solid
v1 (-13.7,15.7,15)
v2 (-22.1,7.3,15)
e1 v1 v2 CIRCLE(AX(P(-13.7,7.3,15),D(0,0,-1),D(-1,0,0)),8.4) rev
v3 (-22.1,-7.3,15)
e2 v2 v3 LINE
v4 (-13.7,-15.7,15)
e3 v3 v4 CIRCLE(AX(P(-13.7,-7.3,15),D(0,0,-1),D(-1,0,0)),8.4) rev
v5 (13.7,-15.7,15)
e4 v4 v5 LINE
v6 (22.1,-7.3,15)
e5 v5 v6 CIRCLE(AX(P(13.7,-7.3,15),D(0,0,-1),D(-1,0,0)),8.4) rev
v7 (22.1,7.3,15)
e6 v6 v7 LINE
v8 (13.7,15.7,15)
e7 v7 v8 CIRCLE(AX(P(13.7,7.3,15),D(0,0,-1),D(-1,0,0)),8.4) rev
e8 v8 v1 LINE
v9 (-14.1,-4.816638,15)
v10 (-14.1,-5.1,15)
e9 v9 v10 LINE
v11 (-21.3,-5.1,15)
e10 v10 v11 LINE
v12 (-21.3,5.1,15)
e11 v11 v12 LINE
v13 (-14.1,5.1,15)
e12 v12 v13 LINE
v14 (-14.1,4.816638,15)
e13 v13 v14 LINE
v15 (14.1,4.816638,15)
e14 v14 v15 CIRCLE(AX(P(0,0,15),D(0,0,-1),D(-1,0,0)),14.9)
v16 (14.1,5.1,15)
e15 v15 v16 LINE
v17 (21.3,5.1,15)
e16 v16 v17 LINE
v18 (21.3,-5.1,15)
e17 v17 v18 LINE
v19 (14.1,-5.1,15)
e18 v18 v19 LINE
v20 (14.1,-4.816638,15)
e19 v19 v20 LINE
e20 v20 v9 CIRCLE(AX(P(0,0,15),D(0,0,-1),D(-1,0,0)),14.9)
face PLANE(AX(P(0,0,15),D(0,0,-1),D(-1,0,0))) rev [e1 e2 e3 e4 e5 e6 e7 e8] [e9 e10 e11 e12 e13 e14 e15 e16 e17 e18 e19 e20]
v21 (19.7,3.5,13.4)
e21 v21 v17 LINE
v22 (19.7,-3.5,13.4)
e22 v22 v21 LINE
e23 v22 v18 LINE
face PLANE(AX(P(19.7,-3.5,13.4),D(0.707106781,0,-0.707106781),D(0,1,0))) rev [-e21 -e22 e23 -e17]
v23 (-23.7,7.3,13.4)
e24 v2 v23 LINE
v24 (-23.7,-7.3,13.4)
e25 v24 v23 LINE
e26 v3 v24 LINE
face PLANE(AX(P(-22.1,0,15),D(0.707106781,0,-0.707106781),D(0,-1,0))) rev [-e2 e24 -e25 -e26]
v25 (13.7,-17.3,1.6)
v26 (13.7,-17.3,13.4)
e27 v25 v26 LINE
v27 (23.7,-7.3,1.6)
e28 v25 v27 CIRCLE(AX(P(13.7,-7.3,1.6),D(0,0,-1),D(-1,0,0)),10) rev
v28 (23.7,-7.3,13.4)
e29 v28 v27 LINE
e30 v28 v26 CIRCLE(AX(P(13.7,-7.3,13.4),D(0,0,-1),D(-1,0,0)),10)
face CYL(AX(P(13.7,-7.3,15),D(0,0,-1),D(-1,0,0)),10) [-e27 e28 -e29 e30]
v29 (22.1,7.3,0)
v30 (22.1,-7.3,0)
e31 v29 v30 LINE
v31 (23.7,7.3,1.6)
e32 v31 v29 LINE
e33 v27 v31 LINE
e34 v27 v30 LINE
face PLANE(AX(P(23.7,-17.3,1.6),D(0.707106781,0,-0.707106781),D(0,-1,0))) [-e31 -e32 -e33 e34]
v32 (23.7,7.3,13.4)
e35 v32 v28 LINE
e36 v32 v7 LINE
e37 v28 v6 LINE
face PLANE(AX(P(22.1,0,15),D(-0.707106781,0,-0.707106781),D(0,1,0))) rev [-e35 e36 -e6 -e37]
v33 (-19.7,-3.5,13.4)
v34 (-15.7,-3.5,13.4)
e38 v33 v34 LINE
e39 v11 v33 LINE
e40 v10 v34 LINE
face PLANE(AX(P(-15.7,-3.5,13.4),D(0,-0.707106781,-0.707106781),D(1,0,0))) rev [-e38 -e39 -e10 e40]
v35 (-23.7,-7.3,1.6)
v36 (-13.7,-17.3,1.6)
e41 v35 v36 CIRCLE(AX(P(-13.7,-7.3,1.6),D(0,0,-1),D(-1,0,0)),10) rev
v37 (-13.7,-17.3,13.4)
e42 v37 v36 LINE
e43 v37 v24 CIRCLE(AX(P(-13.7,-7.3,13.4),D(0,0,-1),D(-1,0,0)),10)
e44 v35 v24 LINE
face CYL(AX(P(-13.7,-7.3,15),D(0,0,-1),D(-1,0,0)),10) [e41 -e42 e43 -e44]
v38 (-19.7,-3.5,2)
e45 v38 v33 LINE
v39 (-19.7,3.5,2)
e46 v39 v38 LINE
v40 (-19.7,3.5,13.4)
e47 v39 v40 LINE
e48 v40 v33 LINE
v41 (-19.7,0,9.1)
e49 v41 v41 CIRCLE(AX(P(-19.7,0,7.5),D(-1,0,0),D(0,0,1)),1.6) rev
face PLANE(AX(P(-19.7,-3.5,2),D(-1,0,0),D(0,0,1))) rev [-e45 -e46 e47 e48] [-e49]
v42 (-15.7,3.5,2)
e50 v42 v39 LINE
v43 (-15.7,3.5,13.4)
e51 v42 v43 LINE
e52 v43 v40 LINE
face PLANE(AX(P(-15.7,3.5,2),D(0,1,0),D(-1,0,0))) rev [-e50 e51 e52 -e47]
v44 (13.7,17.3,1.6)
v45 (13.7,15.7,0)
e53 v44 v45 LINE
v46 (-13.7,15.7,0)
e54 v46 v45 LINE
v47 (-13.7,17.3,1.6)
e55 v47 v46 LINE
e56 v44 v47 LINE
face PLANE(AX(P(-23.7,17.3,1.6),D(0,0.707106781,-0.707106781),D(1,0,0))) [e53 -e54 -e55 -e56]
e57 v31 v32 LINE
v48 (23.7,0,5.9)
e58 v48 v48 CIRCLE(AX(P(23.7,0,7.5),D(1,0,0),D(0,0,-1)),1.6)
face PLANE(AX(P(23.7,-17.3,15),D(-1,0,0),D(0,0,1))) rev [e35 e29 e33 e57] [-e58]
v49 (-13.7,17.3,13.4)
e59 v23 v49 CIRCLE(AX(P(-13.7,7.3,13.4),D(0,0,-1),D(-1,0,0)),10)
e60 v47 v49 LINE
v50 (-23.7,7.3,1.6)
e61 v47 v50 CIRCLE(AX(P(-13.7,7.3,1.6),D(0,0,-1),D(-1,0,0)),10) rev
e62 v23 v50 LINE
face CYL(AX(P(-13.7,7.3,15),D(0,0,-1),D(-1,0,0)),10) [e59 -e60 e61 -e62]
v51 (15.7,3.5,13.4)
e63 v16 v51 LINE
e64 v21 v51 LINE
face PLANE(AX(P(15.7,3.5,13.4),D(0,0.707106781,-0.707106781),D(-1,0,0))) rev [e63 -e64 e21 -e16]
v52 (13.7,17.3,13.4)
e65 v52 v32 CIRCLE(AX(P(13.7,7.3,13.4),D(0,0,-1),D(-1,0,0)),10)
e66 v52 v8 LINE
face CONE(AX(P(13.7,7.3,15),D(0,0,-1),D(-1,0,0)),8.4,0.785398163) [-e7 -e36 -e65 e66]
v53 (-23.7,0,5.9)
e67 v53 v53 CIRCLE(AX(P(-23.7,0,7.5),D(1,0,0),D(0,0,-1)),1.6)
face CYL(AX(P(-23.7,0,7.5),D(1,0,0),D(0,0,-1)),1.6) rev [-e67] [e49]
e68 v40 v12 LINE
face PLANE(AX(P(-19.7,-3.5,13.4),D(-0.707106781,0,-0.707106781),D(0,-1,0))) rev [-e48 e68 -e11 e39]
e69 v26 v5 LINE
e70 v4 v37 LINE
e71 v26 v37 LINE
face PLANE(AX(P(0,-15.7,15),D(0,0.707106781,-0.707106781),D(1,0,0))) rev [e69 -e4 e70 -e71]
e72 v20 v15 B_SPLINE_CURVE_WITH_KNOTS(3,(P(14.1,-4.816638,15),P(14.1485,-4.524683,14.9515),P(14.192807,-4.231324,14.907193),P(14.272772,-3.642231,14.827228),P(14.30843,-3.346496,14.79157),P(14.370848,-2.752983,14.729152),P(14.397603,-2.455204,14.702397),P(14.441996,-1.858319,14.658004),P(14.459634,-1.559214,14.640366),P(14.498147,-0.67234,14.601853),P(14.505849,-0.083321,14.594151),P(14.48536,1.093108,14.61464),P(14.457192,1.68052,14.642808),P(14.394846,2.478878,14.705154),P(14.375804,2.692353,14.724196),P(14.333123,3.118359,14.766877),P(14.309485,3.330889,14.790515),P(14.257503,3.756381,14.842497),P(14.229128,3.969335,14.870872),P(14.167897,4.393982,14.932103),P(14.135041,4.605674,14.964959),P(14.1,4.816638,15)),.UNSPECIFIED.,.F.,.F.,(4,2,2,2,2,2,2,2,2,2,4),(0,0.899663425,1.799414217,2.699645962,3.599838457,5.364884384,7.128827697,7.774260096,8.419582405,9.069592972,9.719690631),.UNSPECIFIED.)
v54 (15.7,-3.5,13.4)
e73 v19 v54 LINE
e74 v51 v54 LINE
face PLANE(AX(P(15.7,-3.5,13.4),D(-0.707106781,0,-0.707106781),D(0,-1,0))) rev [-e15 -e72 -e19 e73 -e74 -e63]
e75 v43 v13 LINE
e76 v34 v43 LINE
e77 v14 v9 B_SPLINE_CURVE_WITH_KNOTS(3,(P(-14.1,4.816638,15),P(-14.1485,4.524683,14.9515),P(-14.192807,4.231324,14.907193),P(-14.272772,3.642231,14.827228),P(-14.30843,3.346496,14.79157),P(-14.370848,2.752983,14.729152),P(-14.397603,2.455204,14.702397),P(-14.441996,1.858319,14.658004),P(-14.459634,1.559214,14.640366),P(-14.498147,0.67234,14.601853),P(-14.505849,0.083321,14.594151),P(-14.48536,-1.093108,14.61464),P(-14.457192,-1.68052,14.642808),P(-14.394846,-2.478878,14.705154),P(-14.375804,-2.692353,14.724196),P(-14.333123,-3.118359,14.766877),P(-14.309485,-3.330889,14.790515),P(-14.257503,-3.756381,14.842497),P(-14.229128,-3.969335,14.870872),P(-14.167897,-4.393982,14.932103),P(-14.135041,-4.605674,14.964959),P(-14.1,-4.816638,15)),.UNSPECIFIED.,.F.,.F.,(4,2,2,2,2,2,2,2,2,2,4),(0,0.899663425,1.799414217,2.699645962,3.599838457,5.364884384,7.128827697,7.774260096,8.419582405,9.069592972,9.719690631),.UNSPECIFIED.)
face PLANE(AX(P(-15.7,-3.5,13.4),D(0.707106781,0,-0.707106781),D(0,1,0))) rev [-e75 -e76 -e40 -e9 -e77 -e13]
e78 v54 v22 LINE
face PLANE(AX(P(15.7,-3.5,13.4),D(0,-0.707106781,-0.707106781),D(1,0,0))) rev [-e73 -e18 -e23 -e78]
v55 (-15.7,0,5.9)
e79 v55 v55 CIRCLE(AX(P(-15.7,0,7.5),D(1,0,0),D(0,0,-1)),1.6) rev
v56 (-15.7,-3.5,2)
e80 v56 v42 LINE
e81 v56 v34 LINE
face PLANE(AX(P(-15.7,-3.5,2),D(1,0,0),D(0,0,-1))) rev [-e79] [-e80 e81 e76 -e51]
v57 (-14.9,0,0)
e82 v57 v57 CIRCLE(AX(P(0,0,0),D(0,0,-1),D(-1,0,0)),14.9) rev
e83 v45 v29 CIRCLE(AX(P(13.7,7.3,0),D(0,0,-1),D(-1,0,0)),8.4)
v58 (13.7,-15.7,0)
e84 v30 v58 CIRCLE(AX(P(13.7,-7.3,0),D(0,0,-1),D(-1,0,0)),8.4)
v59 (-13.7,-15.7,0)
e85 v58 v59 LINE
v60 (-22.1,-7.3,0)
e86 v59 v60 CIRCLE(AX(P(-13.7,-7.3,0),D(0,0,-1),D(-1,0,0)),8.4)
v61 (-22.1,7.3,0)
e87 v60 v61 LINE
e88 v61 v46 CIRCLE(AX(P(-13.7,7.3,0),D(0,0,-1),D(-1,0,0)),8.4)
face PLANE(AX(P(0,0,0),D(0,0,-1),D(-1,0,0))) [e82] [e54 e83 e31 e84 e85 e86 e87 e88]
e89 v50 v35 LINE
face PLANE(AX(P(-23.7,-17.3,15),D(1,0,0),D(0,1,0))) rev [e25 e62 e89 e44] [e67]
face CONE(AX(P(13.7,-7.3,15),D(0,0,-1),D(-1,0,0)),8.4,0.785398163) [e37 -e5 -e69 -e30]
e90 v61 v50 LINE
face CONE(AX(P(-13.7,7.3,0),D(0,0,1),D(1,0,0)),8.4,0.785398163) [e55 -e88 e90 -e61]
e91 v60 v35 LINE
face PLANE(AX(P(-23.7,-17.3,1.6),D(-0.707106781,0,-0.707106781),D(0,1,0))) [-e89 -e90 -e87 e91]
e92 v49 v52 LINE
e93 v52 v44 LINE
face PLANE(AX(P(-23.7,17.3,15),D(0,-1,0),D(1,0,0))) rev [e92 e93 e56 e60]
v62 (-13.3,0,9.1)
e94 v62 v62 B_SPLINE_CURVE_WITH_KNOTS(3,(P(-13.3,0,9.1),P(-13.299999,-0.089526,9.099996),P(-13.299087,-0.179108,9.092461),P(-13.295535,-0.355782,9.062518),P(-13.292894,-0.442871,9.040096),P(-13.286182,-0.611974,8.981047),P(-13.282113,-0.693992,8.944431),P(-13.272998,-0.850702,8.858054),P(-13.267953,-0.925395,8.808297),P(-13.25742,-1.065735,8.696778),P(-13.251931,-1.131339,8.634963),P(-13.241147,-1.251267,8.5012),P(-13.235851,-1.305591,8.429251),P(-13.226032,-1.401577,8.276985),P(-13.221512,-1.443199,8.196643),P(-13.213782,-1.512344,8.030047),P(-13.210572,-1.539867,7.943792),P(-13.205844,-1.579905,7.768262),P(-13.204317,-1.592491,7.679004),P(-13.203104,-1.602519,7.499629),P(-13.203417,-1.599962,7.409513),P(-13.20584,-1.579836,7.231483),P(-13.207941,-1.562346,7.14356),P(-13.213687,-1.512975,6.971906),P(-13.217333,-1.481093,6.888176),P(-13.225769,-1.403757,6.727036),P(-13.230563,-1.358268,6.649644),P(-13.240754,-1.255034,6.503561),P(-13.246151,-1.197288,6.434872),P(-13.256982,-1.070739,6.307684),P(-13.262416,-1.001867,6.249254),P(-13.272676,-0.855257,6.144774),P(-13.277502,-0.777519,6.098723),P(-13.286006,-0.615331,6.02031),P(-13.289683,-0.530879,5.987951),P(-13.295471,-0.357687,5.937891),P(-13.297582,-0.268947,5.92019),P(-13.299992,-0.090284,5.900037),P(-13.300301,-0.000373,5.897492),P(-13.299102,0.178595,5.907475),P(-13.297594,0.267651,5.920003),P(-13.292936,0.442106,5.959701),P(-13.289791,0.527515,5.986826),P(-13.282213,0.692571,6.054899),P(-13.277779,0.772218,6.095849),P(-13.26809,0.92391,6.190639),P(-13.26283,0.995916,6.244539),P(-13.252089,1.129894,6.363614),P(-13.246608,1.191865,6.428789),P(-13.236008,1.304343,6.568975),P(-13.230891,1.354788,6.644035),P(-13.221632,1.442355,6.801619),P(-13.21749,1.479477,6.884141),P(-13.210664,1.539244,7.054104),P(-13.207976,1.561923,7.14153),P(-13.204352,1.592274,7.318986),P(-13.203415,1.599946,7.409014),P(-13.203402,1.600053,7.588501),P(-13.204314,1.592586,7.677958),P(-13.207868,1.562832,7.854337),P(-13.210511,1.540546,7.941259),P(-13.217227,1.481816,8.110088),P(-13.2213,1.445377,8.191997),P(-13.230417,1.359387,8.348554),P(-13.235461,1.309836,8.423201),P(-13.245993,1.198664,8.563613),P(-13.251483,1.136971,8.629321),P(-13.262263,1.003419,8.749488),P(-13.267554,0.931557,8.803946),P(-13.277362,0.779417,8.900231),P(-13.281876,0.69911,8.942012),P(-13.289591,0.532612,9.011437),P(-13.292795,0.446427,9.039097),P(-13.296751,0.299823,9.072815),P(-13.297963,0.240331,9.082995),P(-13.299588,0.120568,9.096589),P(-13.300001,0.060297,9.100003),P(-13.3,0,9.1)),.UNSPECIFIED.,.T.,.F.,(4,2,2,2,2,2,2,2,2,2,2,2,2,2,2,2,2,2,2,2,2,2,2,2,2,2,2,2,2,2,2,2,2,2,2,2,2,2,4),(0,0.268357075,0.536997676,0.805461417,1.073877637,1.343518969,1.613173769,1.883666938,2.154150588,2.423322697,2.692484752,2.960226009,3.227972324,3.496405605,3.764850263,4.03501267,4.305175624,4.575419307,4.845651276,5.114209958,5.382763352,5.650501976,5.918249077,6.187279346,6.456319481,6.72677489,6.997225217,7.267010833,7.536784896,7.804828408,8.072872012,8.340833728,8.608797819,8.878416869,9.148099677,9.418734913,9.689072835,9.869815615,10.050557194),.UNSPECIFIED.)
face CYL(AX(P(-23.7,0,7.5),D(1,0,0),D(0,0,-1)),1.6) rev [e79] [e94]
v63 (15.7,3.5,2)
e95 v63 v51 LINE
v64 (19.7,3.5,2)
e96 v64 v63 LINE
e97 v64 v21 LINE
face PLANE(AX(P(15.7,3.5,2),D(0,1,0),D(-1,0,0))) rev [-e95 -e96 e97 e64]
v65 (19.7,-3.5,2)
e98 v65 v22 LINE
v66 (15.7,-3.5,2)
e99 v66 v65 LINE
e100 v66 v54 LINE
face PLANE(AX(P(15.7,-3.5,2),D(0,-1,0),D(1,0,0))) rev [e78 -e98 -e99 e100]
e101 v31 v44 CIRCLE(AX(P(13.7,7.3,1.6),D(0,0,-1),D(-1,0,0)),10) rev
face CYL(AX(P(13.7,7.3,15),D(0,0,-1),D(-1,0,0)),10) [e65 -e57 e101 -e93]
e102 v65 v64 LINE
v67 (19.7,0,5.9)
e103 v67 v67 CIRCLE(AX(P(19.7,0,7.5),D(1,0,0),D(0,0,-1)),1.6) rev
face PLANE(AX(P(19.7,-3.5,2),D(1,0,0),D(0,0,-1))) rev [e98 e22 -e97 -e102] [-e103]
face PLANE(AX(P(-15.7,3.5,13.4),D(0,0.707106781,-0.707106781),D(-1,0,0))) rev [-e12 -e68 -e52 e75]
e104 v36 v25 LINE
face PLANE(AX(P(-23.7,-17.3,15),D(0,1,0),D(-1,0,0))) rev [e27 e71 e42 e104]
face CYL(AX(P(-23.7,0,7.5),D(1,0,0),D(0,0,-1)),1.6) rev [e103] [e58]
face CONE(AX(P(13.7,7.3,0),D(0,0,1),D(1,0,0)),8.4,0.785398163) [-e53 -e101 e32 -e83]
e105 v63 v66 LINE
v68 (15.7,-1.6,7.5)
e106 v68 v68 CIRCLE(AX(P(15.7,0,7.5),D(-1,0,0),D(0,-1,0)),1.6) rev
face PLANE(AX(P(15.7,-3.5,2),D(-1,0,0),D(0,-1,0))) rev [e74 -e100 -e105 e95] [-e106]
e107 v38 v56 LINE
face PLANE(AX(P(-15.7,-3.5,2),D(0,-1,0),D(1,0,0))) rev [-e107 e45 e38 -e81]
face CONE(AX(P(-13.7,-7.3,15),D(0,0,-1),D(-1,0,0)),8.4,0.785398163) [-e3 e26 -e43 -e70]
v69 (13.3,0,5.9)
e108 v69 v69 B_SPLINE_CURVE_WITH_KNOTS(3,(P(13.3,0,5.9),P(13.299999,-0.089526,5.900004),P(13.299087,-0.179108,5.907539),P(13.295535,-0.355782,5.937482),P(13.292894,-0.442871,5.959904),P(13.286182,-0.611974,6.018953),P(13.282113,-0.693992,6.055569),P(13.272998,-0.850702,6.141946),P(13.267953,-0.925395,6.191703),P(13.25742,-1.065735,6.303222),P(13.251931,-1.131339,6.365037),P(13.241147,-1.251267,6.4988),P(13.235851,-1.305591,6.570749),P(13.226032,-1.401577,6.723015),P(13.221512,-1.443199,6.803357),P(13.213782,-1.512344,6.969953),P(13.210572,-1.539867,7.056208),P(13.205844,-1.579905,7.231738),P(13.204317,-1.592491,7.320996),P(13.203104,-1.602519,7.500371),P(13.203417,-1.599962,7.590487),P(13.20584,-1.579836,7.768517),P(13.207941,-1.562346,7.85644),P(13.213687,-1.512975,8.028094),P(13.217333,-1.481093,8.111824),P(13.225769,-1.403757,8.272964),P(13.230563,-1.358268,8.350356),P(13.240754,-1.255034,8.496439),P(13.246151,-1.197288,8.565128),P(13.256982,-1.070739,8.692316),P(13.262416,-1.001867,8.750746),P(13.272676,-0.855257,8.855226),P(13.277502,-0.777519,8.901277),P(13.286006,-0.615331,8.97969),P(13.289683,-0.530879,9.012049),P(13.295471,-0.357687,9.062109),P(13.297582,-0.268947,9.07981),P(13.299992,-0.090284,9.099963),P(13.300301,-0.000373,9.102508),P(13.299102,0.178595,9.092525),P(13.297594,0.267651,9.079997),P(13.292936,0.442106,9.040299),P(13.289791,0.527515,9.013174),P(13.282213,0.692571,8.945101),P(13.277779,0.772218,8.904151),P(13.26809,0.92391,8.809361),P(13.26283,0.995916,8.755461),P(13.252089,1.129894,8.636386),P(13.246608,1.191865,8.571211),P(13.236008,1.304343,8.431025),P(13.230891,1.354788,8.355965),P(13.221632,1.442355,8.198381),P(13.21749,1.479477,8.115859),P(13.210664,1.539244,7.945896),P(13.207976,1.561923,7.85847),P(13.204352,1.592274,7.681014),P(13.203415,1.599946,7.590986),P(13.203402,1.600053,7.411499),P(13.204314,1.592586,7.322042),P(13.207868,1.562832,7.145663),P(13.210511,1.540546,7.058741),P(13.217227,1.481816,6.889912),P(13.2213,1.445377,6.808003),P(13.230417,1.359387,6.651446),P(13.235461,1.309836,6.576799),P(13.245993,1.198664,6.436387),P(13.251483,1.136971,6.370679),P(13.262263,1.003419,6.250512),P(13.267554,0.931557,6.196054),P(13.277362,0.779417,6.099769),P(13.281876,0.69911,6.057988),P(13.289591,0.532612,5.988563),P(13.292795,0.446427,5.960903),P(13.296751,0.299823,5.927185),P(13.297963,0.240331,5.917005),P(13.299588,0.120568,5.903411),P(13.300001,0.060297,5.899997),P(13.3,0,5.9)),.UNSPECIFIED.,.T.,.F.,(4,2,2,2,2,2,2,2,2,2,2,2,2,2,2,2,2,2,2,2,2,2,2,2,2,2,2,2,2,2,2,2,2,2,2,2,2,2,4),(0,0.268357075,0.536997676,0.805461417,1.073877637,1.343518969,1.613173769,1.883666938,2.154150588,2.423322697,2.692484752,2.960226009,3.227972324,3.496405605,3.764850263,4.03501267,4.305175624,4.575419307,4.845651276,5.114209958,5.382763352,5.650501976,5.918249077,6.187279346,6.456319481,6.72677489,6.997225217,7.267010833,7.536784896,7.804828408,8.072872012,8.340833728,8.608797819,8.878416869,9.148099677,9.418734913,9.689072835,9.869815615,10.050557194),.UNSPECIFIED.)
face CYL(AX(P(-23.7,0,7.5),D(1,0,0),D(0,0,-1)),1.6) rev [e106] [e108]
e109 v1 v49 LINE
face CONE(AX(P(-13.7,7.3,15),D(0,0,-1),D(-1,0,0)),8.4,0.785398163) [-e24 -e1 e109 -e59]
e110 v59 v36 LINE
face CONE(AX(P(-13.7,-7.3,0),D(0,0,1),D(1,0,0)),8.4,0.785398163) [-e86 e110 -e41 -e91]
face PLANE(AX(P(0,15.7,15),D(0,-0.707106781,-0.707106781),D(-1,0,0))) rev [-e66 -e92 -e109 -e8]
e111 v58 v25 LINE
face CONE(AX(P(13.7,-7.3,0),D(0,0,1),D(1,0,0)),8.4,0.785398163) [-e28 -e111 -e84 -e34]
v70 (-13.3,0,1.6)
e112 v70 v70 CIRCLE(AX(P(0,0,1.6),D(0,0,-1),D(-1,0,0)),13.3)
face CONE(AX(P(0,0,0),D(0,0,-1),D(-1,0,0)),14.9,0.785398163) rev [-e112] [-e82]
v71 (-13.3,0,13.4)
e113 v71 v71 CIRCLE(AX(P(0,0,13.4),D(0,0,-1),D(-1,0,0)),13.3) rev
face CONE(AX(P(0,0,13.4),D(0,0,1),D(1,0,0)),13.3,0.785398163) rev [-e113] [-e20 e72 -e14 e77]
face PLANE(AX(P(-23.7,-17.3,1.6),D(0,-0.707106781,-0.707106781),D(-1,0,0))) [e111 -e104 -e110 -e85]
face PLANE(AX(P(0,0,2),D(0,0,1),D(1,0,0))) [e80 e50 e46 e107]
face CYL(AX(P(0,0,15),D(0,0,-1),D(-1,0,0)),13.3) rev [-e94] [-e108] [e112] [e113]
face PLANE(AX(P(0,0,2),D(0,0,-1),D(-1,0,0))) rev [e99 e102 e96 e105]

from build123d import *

# Parameters (mm, degrees)
SKETCH1_W           = 47.4
SKETCH1_H           = 34.6
SKETCH1_R           = 13.3
BOSS_EXTRUDE1_DEPTH = 15
SKETCH2_R           = 1.6
CUT_EXTRUDE1_DEPTH  = 53.640763672
SKETCH3_W           = 4
SKETCH3_H           = 7
CUT_EXTRUDE2_DEPTH  = 13
CHAMFER1_SIZE       = 1.6
FILLET1_R           = 10
CHAMFER3_SIZE       = 1.6
CHAMFER4_SIZE       = 1.6


with BuildPart() as part:
    # Sketch1 → Boss-Extrude1 (new body)
    with BuildSketch(Plane.XY):
        Rectangle(SKETCH1_W, SKETCH1_H)
        Circle(SKETCH1_R, mode=Mode.SUBTRACT)
    extrude(amount=BOSS_EXTRUDE1_DEPTH)

    # Sketch2 → Cut-Extrude1 (cut, through all)
    with BuildSketch(Plane(origin=(23.7, 0, 0), x_dir=(0, 0, -1), z_dir=(1, 0, 0))):
        with Locations((-7.5, 0)):
            Circle(SKETCH2_R)
    extrude(amount=-CUT_EXTRUDE1_DEPTH, mode=Mode.SUBTRACT)

    # Sketch3 → Cut-Extrude2 (cut)
    with BuildSketch(Plane.XY.offset(15)):
        with Locations((17.7, 0)):
            Rectangle(SKETCH3_W, SKETCH3_H)
        with Locations((-17.7, 0)):
            Rectangle(SKETCH3_W, SKETCH3_H)
    extrude(amount=-CUT_EXTRUDE2_DEPTH, mode=Mode.SUBTRACT)

    # Chamfer1
    chamfer1_edges = [part.edges().sort_by_distance(p)[0] for p in [
        (-13.3, 0, 15),
    ]]
    chamfer(chamfer1_edges, length=CHAMFER1_SIZE)

    # Chamfer2
    # the kernel refuses this chamfer: 1.6 mm, written as the material it takes off along each edge
    with BuildSketch(Plane(origin=(19.7, -3.5, 15), x_dir=(0.9996219169112968, 0, 0.027495876610586226), z_dir=(0, 1, 0)), Plane(origin=(15.7, 3.5, 15), x_dir=(-0.9996219169112968, 0, 0.027495876610586285), z_dir=(0, -1, 0)), Plane(origin=(-15.7, -3.5, 15), x_dir=(0.9996219169112968, 0, 0.027495876610586285), z_dir=(0, 1, 0)), Plane(origin=(-19.7, 3.5, 15), x_dir=(-0.9996219169112968, 0, 0.027495876610586226), z_dir=(0, -1, 0))) as chamfer2_piece_1:
        with BuildLine():
            Line((1.645877112, 0), (-0.090475448, 1.64338847))
            Line((-0.090475448, 1.64338847), (-0.122463349, 1.642508602))
            ThreePointArc((-0.122463349, 1.642508602), (-0.054606763, 0.821436527), (-0.031987901, -0.000879868))
            Line((-0.031987901, -0.000879868), (0.000879868, -0.031987901))
            ThreePointArc((0.000879868, -0.031987901), (0.823196264, -0.009369039), (1.64675698, -0.031987901))
            Line((1.64675698, -0.031987901), (1.645877112, 0))
        make_face()
    extrude(amount=7, mode=Mode.SUBTRACT)
    with BuildSketch(Plane(origin=(19.7, 3.5, 15), x_dir=(0, 0.9996219169112968, 0.027495876610586285), z_dir=(-1, 0, 0)), Plane(origin=(15.7, -3.5, 15), x_dir=(0, -0.9996219169112968, 0.02749587661058628), z_dir=(1, 0, 0)), Plane(origin=(-15.7, 3.5, 15), x_dir=(2.330586862957201e-15, 0.9996219169112966, 0.027495876610586265), z_dir=(-1, 0, 0)), Plane(origin=(-19.7, -3.5, 15), x_dir=(2.3305868629572013e-15, -0.9996219169112968, 0.02749587661058628), z_dir=(1, 0, 0))) as chamfer2_piece_2:
        with BuildLine():
            Line((1.645877112, 0), (-0.090475448, 1.64338847))
            Line((-0.090475448, 1.64338847), (-0.122463349, 1.642508602))
            ThreePointArc((-0.122463349, 1.642508602), (-0.054606763, 0.821436527), (-0.031987901, -0.000879868))
            Line((-0.031987901, -0.000879868), (0.000879868, -0.031987901))
            ThreePointArc((0.000879868, -0.031987901), (0.823196264, -0.009369039), (1.64675698, -0.031987901))
            Line((1.64675698, -0.031987901), (1.645877112, 0))
        make_face()
    extrude(amount=4, mode=Mode.SUBTRACT)
    with BuildSketch(Plane(origin=(15.7, -3.5, 15), x_dir=(0, -0.9996219169112968, 0.02749587661058628), z_dir=(1, 0, 0))) as chamfer2_piece_3a_section:
        with BuildLine():
            Line((1.645877112, 0), (-0.090475448, 1.64338847))
            Line((-0.090475448, 1.64338847), (-0.122463349, 1.642508602))
            ThreePointArc((-0.122463349, 1.642508602), (-0.054606763, 0.821436527), (-0.031987901, -0.000879868))
            Line((-0.031987901, -0.000879868), (0.000879868, -0.031987901))
            ThreePointArc((0.000879868, -0.031987901), (0.823196264, -0.009369039), (1.64675698, -0.031987901))
            Line((1.64675698, -0.031987901), (1.645877112, 0))
        make_face()
    chamfer2_piece_3a = extrude(amount=8.114692781, mode=Mode.PRIVATE)
    chamfer2_piece_3a = split(chamfer2_piece_3a, bisect_by=Plane(origin=(19.7, -4.027669803, 14.472330197), z_dir=(1, 0, 0)), keep=Keep.TOP, mode=Mode.PRIVATE)
    with BuildSketch(Plane(origin=(19.7, -7.614692781, 15), x_dir=(0.9996219169112968, 0, 0.027495876610586226), z_dir=(0, 1, 0))) as chamfer2_piece_3b_section:
        with BuildLine():
            Line((1.645877112, 0), (-0.090475448, 1.64338847))
            Line((-0.090475448, 1.64338847), (-0.122463349, 1.642508602))
            ThreePointArc((-0.122463349, 1.642508602), (-0.054606763, 0.821436527), (-0.031987901, -0.000879868))
            Line((-0.031987901, -0.000879868), (0.000879868, -0.031987901))
            ThreePointArc((0.000879868, -0.031987901), (0.823196264, -0.009369039), (1.64675698, -0.031987901))
            Line((1.64675698, -0.031987901), (1.645877112, 0))
        make_face()
    chamfer2_piece_3b = extrude(amount=11.114692781, mode=Mode.PRIVATE)
    chamfer2_piece_3b = split(chamfer2_piece_3b, bisect_by=Plane(origin=(20.227669803, -3.5, 14.472330197), z_dir=(0, -1, 0)), keep=Keep.TOP, mode=Mode.PRIVATE)
    chamfer2_piece_3 = chamfer2_piece_3a & chamfer2_piece_3b
    add(chamfer2_piece_3, mode=Mode.SUBTRACT)
    with BuildSketch(Plane(origin=(19.7, -3.5, 15), x_dir=(0.9996219169112968, 0, 0.027495876610586226), z_dir=(0, 1, 0))) as chamfer2_piece_4a_section:
        with BuildLine():
            Line((1.645877112, 0), (-0.090475448, 1.64338847))
            Line((-0.090475448, 1.64338847), (-0.122463349, 1.642508602))
            ThreePointArc((-0.122463349, 1.642508602), (-0.054606763, 0.821436527), (-0.031987901, -0.000879868))
            Line((-0.031987901, -0.000879868), (0.000879868, -0.031987901))
            ThreePointArc((0.000879868, -0.031987901), (0.823196264, -0.009369039), (1.64675698, -0.031987901))
            Line((1.64675698, -0.031987901), (1.645877112, 0))
        make_face()
    chamfer2_piece_4a = extrude(amount=11.114692781, mode=Mode.PRIVATE)
    chamfer2_piece_4a = split(chamfer2_piece_4a, bisect_by=Plane(origin=(20.227669803, 3.5, 14.472330197), z_dir=(0, 1, 0)), keep=Keep.TOP, mode=Mode.PRIVATE)
    with BuildSketch(Plane(origin=(23.814692781, 3.5, 15), x_dir=(0, 0.9996219169112968, 0.02749587661058628), z_dir=(-1, 0, 0))) as chamfer2_piece_4b_section:
        with BuildLine():
            Line((1.645877112, 0), (-0.090475448, 1.64338847))
            Line((-0.090475448, 1.64338847), (-0.122463349, 1.642508602))
            ThreePointArc((-0.122463349, 1.642508602), (-0.054606763, 0.821436527), (-0.031987901, -0.000879868))
            Line((-0.031987901, -0.000879868), (0.000879868, -0.031987901))
            ThreePointArc((0.000879868, -0.031987901), (0.823196264, -0.009369039), (1.64675698, -0.031987901))
            Line((1.64675698, -0.031987901), (1.645877112, 0))
        make_face()
    chamfer2_piece_4b = extrude(amount=8.114692781, mode=Mode.PRIVATE)
    chamfer2_piece_4b = split(chamfer2_piece_4b, bisect_by=Plane(origin=(19.7, 4.027669803, 14.472330197), z_dir=(1, 0, 0)), keep=Keep.TOP, mode=Mode.PRIVATE)
    chamfer2_piece_4 = chamfer2_piece_4a & chamfer2_piece_4b
    add(chamfer2_piece_4, mode=Mode.SUBTRACT)
    with BuildSketch(Plane(origin=(19.7, 3.5, 15), x_dir=(0, 0.9996219169112968, 0.027495876610586285), z_dir=(-1, 0, 0))) as chamfer2_piece_5a_section:
        with BuildLine():
            Line((1.645877112, 0), (-0.090475448, 1.64338847))
            Line((-0.090475448, 1.64338847), (-0.122463349, 1.642508602))
            ThreePointArc((-0.122463349, 1.642508602), (-0.054606763, 0.821436527), (-0.031987901, -0.000879868))
            Line((-0.031987901, -0.000879868), (0.000879868, -0.031987901))
            ThreePointArc((0.000879868, -0.031987901), (0.823196264, -0.009369039), (1.64675698, -0.031987901))
            Line((1.64675698, -0.031987901), (1.645877112, 0))
        make_face()
    chamfer2_piece_5a = extrude(amount=8.114692781, mode=Mode.PRIVATE)
    chamfer2_piece_5a = split(chamfer2_piece_5a, bisect_by=Plane(origin=(15.7, 4.027669803, 14.472330197), z_dir=(-1, 0, 0)), keep=Keep.TOP, mode=Mode.PRIVATE)
    with BuildSketch(Plane(origin=(15.7, 7.614692781, 15), x_dir=(-0.9996219169112968, 0, 0.027495876610586285), z_dir=(0, -1, 0))) as chamfer2_piece_5b_section:
        with BuildLine():
            Line((1.645877112, 0), (-0.090475448, 1.64338847))
            Line((-0.090475448, 1.64338847), (-0.122463349, 1.642508602))
            ThreePointArc((-0.122463349, 1.642508602), (-0.054606763, 0.821436527), (-0.031987901, -0.000879868))
            Line((-0.031987901, -0.000879868), (0.000879868, -0.031987901))
            ThreePointArc((0.000879868, -0.031987901), (0.823196264, -0.009369039), (1.64675698, -0.031987901))
            Line((1.64675698, -0.031987901), (1.645877112, 0))
        make_face()
    chamfer2_piece_5b = extrude(amount=11.114692781, mode=Mode.PRIVATE)
    chamfer2_piece_5b = split(chamfer2_piece_5b, bisect_by=Plane(origin=(15.172330197, 3.5, 14.472330197), z_dir=(0, 1, 0)), keep=Keep.TOP, mode=Mode.PRIVATE)
    chamfer2_piece_5 = chamfer2_piece_5a & chamfer2_piece_5b
    add(chamfer2_piece_5, mode=Mode.SUBTRACT)
    with BuildSketch(Plane(origin=(11.585307219, -3.5, 15), x_dir=(0, -0.9996219169112966, 0.027495876610586265), z_dir=(1, 0, 0))) as chamfer2_piece_6a_section:
        with BuildLine():
            Line((1.645877112, 0), (-0.090475448, 1.64338847))
            Line((-0.090475448, 1.64338847), (-0.122463349, 1.642508602))
            ThreePointArc((-0.122463349, 1.642508602), (-0.054606763, 0.821436527), (-0.031987901, -0.000879868))
            Line((-0.031987901, -0.000879868), (0.000879868, -0.031987901))
            ThreePointArc((0.000879868, -0.031987901), (0.823196264, -0.009369039), (1.64675698, -0.031987901))
            Line((1.64675698, -0.031987901), (1.645877112, 0))
        make_face()
    chamfer2_piece_6a = extrude(amount=8.114692781, mode=Mode.PRIVATE)
    chamfer2_piece_6a = split(chamfer2_piece_6a, bisect_by=Plane(origin=(15.7, -4.027669803, 14.472330197), z_dir=(-1, 0, 0)), keep=Keep.TOP, mode=Mode.PRIVATE)
    with BuildSketch(Plane(origin=(15.7, 3.5, 15), x_dir=(-0.9996219169112968, 0, 0.027495876610586285), z_dir=(0, -1, 0))) as chamfer2_piece_6b_section:
        with BuildLine():
            Line((1.645877112, 0), (-0.090475448, 1.64338847))
            Line((-0.090475448, 1.64338847), (-0.122463349, 1.642508602))
            ThreePointArc((-0.122463349, 1.642508602), (-0.054606763, 0.821436527), (-0.031987901, -0.000879868))
            Line((-0.031987901, -0.000879868), (0.000879868, -0.031987901))
            ThreePointArc((0.000879868, -0.031987901), (0.823196264, -0.009369039), (1.64675698, -0.031987901))
            Line((1.64675698, -0.031987901), (1.645877112, 0))
        make_face()
    chamfer2_piece_6b = extrude(amount=11.114692781, mode=Mode.PRIVATE)
    chamfer2_piece_6b = split(chamfer2_piece_6b, bisect_by=Plane(origin=(15.172330197, -3.5, 14.472330197), z_dir=(0, -1, 0)), keep=Keep.TOP, mode=Mode.PRIVATE)
    chamfer2_piece_6 = chamfer2_piece_6a & chamfer2_piece_6b
    add(chamfer2_piece_6, mode=Mode.SUBTRACT)
    with BuildSketch(Plane(origin=(-19.7, -3.5, 15), x_dir=(2.3305868629572013e-15, -0.9996219169112968, 0.02749587661058628), z_dir=(1, 0, 0))) as chamfer2_piece_7a_section:
        with BuildLine():
            Line((1.645877112, 0), (-0.090475448, 1.64338847))
            Line((-0.090475448, 1.64338847), (-0.122463349, 1.642508602))
            ThreePointArc((-0.122463349, 1.642508602), (-0.054606763, 0.821436527), (-0.031987901, -0.000879868))
            Line((-0.031987901, -0.000879868), (0.000879868, -0.031987901))
            ThreePointArc((0.000879868, -0.031987901), (0.823196264, -0.009369039), (1.64675698, -0.031987901))
            Line((1.64675698, -0.031987901), (1.645877112, 0))
        make_face()
    chamfer2_piece_7a = extrude(amount=8.114692781, mode=Mode.PRIVATE)
    chamfer2_piece_7a = split(chamfer2_piece_7a, bisect_by=Plane(origin=(-15.7, -4.027669803, 14.472330197), z_dir=(1, 0, 0)), keep=Keep.TOP, mode=Mode.PRIVATE)
    with BuildSketch(Plane(origin=(-15.7, -7.614692781, 15), x_dir=(0.9996219169112968, 0, 0.027495876610586285), z_dir=(0, 1, 0))) as chamfer2_piece_7b_section:
        with BuildLine():
            Line((1.645877112, 0), (-0.090475448, 1.64338847))
            Line((-0.090475448, 1.64338847), (-0.122463349, 1.642508602))
            ThreePointArc((-0.122463349, 1.642508602), (-0.054606763, 0.821436527), (-0.031987901, -0.000879868))
            Line((-0.031987901, -0.000879868), (0.000879868, -0.031987901))
            ThreePointArc((0.000879868, -0.031987901), (0.823196264, -0.009369039), (1.64675698, -0.031987901))
            Line((1.64675698, -0.031987901), (1.645877112, 0))
        make_face()
    chamfer2_piece_7b = extrude(amount=11.114692781, mode=Mode.PRIVATE)
    chamfer2_piece_7b = split(chamfer2_piece_7b, bisect_by=Plane(origin=(-15.172330197, -3.5, 14.472330197), z_dir=(0, -1, 0)), keep=Keep.TOP, mode=Mode.PRIVATE)
    chamfer2_piece_7 = chamfer2_piece_7a & chamfer2_piece_7b
    add(chamfer2_piece_7, mode=Mode.SUBTRACT)
    with BuildSketch(Plane(origin=(-11.585307219, 3.5, 15), x_dir=(2.3305868629572017e-15, 0.9996219169112968, 0.027495876610586285), z_dir=(-1, 0, 0))) as chamfer2_piece_8a_section:
        with BuildLine():
            Line((1.645877112, 0), (-0.090475448, 1.64338847))
            Line((-0.090475448, 1.64338847), (-0.122463349, 1.642508602))
            ThreePointArc((-0.122463349, 1.642508602), (-0.054606763, 0.821436527), (-0.031987901, -0.000879868))
            Line((-0.031987901, -0.000879868), (0.000879868, -0.031987901))
            ThreePointArc((0.000879868, -0.031987901), (0.823196264, -0.009369039), (1.64675698, -0.031987901))
            Line((1.64675698, -0.031987901), (1.645877112, 0))
        make_face()
    chamfer2_piece_8a = extrude(amount=8.114692781, mode=Mode.PRIVATE)
    chamfer2_piece_8a = split(chamfer2_piece_8a, bisect_by=Plane(origin=(-15.7, 4.027669803, 14.472330197), z_dir=(1, 0, 0)), keep=Keep.TOP, mode=Mode.PRIVATE)
    with BuildSketch(Plane(origin=(-15.7, -3.5, 15), x_dir=(0.9996219169112968, 0, 0.027495876610586285), z_dir=(0, 1, 0))) as chamfer2_piece_8b_section:
        with BuildLine():
            Line((1.645877112, 0), (-0.090475448, 1.64338847))
            Line((-0.090475448, 1.64338847), (-0.122463349, 1.642508602))
            ThreePointArc((-0.122463349, 1.642508602), (-0.054606763, 0.821436527), (-0.031987901, -0.000879868))
            Line((-0.031987901, -0.000879868), (0.000879868, -0.031987901))
            ThreePointArc((0.000879868, -0.031987901), (0.823196264, -0.009369039), (1.64675698, -0.031987901))
            Line((1.64675698, -0.031987901), (1.645877112, 0))
        make_face()
    chamfer2_piece_8b = extrude(amount=11.114692781, mode=Mode.PRIVATE)
    chamfer2_piece_8b = split(chamfer2_piece_8b, bisect_by=Plane(origin=(-15.172330197, 3.5, 14.472330197), z_dir=(0, 1, 0)), keep=Keep.TOP, mode=Mode.PRIVATE)
    chamfer2_piece_8 = chamfer2_piece_8a & chamfer2_piece_8b
    add(chamfer2_piece_8, mode=Mode.SUBTRACT)
    with BuildSketch(Plane(origin=(-15.7, 3.5, 15), x_dir=(2.330586862957201e-15, 0.9996219169112966, 0.027495876610586265), z_dir=(-1, 0, 0))) as chamfer2_piece_9a_section:
        with BuildLine():
            Line((1.645877112, 0), (-0.090475448, 1.64338847))
            Line((-0.090475448, 1.64338847), (-0.122463349, 1.642508602))
            ThreePointArc((-0.122463349, 1.642508602), (-0.054606763, 0.821436527), (-0.031987901, -0.000879868))
            Line((-0.031987901, -0.000879868), (0.000879868, -0.031987901))
            ThreePointArc((0.000879868, -0.031987901), (0.823196264, -0.009369039), (1.64675698, -0.031987901))
            Line((1.64675698, -0.031987901), (1.645877112, 0))
        make_face()
    chamfer2_piece_9a = extrude(amount=8.114692781, mode=Mode.PRIVATE)
    chamfer2_piece_9a = split(chamfer2_piece_9a, bisect_by=Plane(origin=(-19.7, 4.027669803, 14.472330197), z_dir=(-1, 0, 0)), keep=Keep.TOP, mode=Mode.PRIVATE)
    with BuildSketch(Plane(origin=(-19.7, 7.614692781, 15), x_dir=(-0.9996219169112968, 0, 0.027495876610586226), z_dir=(0, -1, 0))) as chamfer2_piece_9b_section:
        with BuildLine():
            Line((1.645877112, 0), (-0.090475448, 1.64338847))
            Line((-0.090475448, 1.64338847), (-0.122463349, 1.642508602))
            ThreePointArc((-0.122463349, 1.642508602), (-0.054606763, 0.821436527), (-0.031987901, -0.000879868))
            Line((-0.031987901, -0.000879868), (0.000879868, -0.031987901))
            ThreePointArc((0.000879868, -0.031987901), (0.823196264, -0.009369039), (1.64675698, -0.031987901))
            Line((1.64675698, -0.031987901), (1.645877112, 0))
        make_face()
    chamfer2_piece_9b = extrude(amount=11.114692781, mode=Mode.PRIVATE)
    chamfer2_piece_9b = split(chamfer2_piece_9b, bisect_by=Plane(origin=(-20.227669803, 3.5, 14.472330197), z_dir=(0, 1, 0)), keep=Keep.TOP, mode=Mode.PRIVATE)
    chamfer2_piece_9 = chamfer2_piece_9a & chamfer2_piece_9b
    add(chamfer2_piece_9, mode=Mode.SUBTRACT)
    with BuildSketch(Plane(origin=(-19.7, 3.5, 15), x_dir=(-0.9996219169112968, 0, 0.027495876610586226), z_dir=(0, -1, 0))) as chamfer2_piece_10a_section:
        with BuildLine():
            Line((1.645877112, 0), (-0.090475448, 1.64338847))
            Line((-0.090475448, 1.64338847), (-0.122463349, 1.642508602))
            ThreePointArc((-0.122463349, 1.642508602), (-0.054606763, 0.821436527), (-0.031987901, -0.000879868))
            Line((-0.031987901, -0.000879868), (0.000879868, -0.031987901))
            ThreePointArc((0.000879868, -0.031987901), (0.823196264, -0.009369039), (1.64675698, -0.031987901))
            Line((1.64675698, -0.031987901), (1.645877112, 0))
        make_face()
    chamfer2_piece_10a = extrude(amount=11.114692781, mode=Mode.PRIVATE)
    chamfer2_piece_10a = split(chamfer2_piece_10a, bisect_by=Plane(origin=(-20.227669803, -3.5, 14.472330197), z_dir=(0, -1, 0)), keep=Keep.TOP, mode=Mode.PRIVATE)
    with BuildSketch(Plane(origin=(-23.814692781, -3.5, 15), x_dir=(2.3305868629572013e-15, -0.9996219169112968, 0.02749587661058628), z_dir=(1, 0, 0))) as chamfer2_piece_10b_section:
        with BuildLine():
            Line((1.645877112, 0), (-0.090475448, 1.64338847))
            Line((-0.090475448, 1.64338847), (-0.122463349, 1.642508602))
            ThreePointArc((-0.122463349, 1.642508602), (-0.054606763, 0.821436527), (-0.031987901, -0.000879868))
            Line((-0.031987901, -0.000879868), (0.000879868, -0.031987901))
            ThreePointArc((0.000879868, -0.031987901), (0.823196264, -0.009369039), (1.64675698, -0.031987901))
            Line((1.64675698, -0.031987901), (1.645877112, 0))
        make_face()
    chamfer2_piece_10b = extrude(amount=8.114692781, mode=Mode.PRIVATE)
    chamfer2_piece_10b = split(chamfer2_piece_10b, bisect_by=Plane(origin=(-19.7, -4.027669803, 14.472330197), z_dir=(-1, 0, 0)), keep=Keep.TOP, mode=Mode.PRIVATE)
    chamfer2_piece_10 = chamfer2_piece_10a & chamfer2_piece_10b
    add(chamfer2_piece_10, mode=Mode.SUBTRACT)

    # Fillet1
    fillet1_edges = [part.edges().sort_by_distance(p)[0] for p in [
        (23.7, -17.3, 7.5),
        (-23.7, -17.3, 7.5),
        (-23.7, 17.3, 7.5),
        (23.7, 17.3, 7.5),
    ]]
    fillet(fillet1_edges, radius=FILLET1_R)

    # Chamfer3
    chamfer3_edges = [part.edges().sort_by_distance(p)[0] for p in [
        (-13.3, 0, 0),
        (0, 17.3, 0),
        (23.7, 0, 0),
        (0, -17.3, 0),
        (-23.7, 0, 0),
        (-20.771067812, 14.371067812, 0),
        (-20.771067812, -14.371067812, 0),
        (20.771067812, -14.371067812, 0),
        (20.771067812, 14.371067812, 0),
    ]]
    chamfer(chamfer3_edges, length=CHAMFER3_SIZE)

    # Chamfer4
    chamfer4_edges = [part.edges().sort_by_distance(p)[0] for p in [
        (-23.7, 0, 15),
        (0, -17.3, 15),
        (-20.771067812, 14.371067812, 15),
        (-20.771067812, -14.371067812, 15),
        (20.771067812, -14.371067812, 15),
        (20.771067812, 14.371067812, 15),
        (0, 17.3, 15),
        (23.7, 0, 15),
    ]]
    chamfer(chamfer4_edges, length=CHAMFER4_SIZE)


solid = part.part
